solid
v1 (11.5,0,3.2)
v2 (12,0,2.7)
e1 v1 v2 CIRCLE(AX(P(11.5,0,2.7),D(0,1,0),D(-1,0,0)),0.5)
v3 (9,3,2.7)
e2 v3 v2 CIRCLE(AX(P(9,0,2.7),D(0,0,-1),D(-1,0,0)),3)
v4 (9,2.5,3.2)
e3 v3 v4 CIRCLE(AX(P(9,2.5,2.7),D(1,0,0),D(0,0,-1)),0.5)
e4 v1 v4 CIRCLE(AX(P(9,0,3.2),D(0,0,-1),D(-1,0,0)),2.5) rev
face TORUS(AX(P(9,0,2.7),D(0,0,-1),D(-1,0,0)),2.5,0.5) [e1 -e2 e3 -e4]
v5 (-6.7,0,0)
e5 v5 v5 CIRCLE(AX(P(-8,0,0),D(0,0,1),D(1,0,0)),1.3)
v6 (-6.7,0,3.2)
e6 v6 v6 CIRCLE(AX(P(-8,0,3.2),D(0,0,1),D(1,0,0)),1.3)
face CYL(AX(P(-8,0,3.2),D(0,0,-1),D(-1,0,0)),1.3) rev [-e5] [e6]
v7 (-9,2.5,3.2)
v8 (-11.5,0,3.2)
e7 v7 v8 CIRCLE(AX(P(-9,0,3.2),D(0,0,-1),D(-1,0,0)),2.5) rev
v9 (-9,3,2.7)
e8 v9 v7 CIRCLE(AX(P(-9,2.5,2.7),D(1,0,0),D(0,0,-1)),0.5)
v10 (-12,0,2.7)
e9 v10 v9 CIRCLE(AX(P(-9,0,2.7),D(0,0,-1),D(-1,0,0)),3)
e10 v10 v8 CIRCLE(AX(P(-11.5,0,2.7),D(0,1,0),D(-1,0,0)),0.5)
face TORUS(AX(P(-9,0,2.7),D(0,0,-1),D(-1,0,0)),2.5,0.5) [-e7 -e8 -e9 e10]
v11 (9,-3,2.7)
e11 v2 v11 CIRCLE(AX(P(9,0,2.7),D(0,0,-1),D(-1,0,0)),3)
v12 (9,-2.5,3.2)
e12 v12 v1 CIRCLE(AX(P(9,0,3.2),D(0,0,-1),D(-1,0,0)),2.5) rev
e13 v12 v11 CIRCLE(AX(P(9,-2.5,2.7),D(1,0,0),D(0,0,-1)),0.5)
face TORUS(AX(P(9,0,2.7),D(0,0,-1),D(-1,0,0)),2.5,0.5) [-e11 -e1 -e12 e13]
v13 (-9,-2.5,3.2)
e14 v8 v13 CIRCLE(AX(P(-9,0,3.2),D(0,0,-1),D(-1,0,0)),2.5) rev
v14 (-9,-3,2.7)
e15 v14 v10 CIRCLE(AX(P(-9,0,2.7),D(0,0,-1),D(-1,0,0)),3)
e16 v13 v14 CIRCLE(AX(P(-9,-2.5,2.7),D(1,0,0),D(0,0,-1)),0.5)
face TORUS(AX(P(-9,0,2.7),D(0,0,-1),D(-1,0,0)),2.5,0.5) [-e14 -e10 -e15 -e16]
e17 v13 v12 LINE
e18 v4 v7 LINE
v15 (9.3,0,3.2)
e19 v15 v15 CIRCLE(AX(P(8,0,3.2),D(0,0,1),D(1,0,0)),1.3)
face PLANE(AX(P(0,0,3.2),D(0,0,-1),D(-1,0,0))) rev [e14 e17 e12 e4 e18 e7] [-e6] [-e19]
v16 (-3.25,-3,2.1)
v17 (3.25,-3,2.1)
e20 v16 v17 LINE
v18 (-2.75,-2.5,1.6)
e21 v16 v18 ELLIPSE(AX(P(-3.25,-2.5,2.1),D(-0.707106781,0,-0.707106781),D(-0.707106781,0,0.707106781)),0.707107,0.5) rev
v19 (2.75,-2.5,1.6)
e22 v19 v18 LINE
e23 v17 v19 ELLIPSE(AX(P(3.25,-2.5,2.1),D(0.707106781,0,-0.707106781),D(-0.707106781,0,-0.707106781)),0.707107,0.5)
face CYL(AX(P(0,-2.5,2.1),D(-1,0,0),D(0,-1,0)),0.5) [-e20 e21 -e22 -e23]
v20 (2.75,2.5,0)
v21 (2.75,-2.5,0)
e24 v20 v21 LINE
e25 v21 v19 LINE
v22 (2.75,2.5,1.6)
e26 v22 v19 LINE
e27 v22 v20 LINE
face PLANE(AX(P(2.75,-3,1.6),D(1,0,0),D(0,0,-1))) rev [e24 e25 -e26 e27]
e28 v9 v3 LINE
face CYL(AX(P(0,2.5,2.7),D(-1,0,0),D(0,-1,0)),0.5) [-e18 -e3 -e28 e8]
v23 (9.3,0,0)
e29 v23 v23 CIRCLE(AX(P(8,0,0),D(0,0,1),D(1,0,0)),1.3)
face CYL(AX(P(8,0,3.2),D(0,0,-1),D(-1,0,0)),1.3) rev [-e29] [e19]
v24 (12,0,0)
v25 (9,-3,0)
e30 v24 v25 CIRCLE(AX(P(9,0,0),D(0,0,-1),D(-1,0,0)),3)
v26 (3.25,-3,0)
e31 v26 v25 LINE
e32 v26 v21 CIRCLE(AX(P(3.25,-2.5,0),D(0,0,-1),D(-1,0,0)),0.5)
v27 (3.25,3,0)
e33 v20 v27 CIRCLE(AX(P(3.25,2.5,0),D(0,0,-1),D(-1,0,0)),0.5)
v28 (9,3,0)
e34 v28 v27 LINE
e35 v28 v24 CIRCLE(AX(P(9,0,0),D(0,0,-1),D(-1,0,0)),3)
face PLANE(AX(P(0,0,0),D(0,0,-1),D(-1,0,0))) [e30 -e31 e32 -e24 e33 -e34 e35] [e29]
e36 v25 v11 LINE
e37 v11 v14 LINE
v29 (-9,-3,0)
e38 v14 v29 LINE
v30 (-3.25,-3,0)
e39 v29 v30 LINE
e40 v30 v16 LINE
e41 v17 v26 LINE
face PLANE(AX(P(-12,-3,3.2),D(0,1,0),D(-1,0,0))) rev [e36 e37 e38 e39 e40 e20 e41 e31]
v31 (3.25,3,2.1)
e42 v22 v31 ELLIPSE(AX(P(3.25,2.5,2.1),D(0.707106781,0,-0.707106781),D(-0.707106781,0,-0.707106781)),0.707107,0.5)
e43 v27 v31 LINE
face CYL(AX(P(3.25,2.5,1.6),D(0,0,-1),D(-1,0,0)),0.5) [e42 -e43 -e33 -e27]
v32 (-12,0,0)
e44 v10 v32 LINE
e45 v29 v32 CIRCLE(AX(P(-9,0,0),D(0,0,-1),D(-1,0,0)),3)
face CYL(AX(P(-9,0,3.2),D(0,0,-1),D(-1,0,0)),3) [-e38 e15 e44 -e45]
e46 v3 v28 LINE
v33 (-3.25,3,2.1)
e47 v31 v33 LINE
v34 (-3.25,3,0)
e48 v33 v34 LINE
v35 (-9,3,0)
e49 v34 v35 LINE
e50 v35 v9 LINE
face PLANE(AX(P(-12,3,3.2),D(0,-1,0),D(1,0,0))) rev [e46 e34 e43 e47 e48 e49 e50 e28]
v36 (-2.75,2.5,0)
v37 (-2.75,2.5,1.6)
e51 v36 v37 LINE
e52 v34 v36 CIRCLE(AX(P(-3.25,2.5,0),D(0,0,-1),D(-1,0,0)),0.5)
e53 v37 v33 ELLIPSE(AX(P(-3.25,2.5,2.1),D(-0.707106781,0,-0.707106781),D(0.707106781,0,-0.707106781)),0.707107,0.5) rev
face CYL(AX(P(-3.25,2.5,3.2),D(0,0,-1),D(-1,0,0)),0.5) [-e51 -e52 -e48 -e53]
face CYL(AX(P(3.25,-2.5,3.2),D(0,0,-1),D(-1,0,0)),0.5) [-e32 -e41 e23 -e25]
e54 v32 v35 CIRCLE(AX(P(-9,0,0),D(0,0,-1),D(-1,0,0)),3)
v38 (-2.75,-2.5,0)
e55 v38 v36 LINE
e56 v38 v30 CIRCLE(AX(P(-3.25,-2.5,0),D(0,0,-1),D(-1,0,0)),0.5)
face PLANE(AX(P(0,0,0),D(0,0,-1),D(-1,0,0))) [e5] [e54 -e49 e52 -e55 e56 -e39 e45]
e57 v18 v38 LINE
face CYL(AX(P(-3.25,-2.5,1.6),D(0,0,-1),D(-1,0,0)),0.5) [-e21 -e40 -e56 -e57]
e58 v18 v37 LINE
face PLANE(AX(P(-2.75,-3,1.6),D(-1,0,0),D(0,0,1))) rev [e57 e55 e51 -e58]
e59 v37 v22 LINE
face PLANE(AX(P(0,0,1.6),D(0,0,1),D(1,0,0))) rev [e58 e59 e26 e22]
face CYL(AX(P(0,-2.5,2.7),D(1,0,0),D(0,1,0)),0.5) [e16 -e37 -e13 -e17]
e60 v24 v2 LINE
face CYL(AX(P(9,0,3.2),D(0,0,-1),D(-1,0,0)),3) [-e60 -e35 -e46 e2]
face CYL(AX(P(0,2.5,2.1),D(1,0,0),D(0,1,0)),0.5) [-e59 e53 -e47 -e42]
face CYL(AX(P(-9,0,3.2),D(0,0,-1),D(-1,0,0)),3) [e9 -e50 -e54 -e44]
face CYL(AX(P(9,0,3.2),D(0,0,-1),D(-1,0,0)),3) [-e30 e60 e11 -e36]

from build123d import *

# Parameters (mm, degrees)
SKETCH1_W           = 24
SKETCH1_H           = 6
SKETCH1_R           = 1.3
BOSS_EXTRUDE1_DEPTH = 3.2
SKETCH2_W           = 5.5
SKETCH2_H           = 6
CUT_EXTRUDE1_DEPTH  = 1.6
FILLET1_R           = 3
FILLET2_R           = 0.5


with BuildPart() as part:
    # Sketch1 → Boss-Extrude1 (new body)
    with BuildSketch(Plane.XY):
        Rectangle(SKETCH1_W, SKETCH1_H)
        with Locations((-8, 0)):
            Circle(SKETCH1_R, mode=Mode.SUBTRACT)
        with Locations((8, 0)):
            Circle(SKETCH1_R, mode=Mode.SUBTRACT)
    extrude(amount=BOSS_EXTRUDE1_DEPTH)

    # Sketch2 → Cut-Extrude1 (cut)
    with BuildSketch(Plane(origin=(0, 0, 0), x_dir=(-1, 0, 0), z_dir=(0, 0, -1))):
        Rectangle(SKETCH2_W, SKETCH2_H)
    extrude(amount=-CUT_EXTRUDE1_DEPTH, mode=Mode.SUBTRACT)

    # Fillet1
    fillet1_edges = [part.edges().sort_by_distance(p)[0] for p in [
        (-12, -3, 1.6),
        (-12, 3, 1.6),
        (12, -3, 1.6),
        (12, 3, 1.6),
    ]]
    fillet(fillet1_edges, radius=FILLET1_R - 0.0001)  # a hair under: the kernel refuses the full size

    # Fillet2
    fillet2_edges = [part.edges().sort_by_distance(p)[0] for p in [
        (-2.75, 3, 0.8),
        (0, -3, 1.6),
        (-2.75, -3, 0.8),
        (2.75, -3, 0.8),
        (0, 3, 1.6),
        (2.75, 3, 0.8),
        (0, -3, 3.2),
        (0, 3, 3.2),
        (11.121349633, 2.121349633, 3.2),
        (11.121349633, -2.121349633, 3.2),
        (-11.121349633, 2.121349633, 3.2),
        (-11.121349633, -2.121349633, 3.2),
    ]]
    fillet(fillet2_edges, radius=FILLET2_R)


solid = part.part
